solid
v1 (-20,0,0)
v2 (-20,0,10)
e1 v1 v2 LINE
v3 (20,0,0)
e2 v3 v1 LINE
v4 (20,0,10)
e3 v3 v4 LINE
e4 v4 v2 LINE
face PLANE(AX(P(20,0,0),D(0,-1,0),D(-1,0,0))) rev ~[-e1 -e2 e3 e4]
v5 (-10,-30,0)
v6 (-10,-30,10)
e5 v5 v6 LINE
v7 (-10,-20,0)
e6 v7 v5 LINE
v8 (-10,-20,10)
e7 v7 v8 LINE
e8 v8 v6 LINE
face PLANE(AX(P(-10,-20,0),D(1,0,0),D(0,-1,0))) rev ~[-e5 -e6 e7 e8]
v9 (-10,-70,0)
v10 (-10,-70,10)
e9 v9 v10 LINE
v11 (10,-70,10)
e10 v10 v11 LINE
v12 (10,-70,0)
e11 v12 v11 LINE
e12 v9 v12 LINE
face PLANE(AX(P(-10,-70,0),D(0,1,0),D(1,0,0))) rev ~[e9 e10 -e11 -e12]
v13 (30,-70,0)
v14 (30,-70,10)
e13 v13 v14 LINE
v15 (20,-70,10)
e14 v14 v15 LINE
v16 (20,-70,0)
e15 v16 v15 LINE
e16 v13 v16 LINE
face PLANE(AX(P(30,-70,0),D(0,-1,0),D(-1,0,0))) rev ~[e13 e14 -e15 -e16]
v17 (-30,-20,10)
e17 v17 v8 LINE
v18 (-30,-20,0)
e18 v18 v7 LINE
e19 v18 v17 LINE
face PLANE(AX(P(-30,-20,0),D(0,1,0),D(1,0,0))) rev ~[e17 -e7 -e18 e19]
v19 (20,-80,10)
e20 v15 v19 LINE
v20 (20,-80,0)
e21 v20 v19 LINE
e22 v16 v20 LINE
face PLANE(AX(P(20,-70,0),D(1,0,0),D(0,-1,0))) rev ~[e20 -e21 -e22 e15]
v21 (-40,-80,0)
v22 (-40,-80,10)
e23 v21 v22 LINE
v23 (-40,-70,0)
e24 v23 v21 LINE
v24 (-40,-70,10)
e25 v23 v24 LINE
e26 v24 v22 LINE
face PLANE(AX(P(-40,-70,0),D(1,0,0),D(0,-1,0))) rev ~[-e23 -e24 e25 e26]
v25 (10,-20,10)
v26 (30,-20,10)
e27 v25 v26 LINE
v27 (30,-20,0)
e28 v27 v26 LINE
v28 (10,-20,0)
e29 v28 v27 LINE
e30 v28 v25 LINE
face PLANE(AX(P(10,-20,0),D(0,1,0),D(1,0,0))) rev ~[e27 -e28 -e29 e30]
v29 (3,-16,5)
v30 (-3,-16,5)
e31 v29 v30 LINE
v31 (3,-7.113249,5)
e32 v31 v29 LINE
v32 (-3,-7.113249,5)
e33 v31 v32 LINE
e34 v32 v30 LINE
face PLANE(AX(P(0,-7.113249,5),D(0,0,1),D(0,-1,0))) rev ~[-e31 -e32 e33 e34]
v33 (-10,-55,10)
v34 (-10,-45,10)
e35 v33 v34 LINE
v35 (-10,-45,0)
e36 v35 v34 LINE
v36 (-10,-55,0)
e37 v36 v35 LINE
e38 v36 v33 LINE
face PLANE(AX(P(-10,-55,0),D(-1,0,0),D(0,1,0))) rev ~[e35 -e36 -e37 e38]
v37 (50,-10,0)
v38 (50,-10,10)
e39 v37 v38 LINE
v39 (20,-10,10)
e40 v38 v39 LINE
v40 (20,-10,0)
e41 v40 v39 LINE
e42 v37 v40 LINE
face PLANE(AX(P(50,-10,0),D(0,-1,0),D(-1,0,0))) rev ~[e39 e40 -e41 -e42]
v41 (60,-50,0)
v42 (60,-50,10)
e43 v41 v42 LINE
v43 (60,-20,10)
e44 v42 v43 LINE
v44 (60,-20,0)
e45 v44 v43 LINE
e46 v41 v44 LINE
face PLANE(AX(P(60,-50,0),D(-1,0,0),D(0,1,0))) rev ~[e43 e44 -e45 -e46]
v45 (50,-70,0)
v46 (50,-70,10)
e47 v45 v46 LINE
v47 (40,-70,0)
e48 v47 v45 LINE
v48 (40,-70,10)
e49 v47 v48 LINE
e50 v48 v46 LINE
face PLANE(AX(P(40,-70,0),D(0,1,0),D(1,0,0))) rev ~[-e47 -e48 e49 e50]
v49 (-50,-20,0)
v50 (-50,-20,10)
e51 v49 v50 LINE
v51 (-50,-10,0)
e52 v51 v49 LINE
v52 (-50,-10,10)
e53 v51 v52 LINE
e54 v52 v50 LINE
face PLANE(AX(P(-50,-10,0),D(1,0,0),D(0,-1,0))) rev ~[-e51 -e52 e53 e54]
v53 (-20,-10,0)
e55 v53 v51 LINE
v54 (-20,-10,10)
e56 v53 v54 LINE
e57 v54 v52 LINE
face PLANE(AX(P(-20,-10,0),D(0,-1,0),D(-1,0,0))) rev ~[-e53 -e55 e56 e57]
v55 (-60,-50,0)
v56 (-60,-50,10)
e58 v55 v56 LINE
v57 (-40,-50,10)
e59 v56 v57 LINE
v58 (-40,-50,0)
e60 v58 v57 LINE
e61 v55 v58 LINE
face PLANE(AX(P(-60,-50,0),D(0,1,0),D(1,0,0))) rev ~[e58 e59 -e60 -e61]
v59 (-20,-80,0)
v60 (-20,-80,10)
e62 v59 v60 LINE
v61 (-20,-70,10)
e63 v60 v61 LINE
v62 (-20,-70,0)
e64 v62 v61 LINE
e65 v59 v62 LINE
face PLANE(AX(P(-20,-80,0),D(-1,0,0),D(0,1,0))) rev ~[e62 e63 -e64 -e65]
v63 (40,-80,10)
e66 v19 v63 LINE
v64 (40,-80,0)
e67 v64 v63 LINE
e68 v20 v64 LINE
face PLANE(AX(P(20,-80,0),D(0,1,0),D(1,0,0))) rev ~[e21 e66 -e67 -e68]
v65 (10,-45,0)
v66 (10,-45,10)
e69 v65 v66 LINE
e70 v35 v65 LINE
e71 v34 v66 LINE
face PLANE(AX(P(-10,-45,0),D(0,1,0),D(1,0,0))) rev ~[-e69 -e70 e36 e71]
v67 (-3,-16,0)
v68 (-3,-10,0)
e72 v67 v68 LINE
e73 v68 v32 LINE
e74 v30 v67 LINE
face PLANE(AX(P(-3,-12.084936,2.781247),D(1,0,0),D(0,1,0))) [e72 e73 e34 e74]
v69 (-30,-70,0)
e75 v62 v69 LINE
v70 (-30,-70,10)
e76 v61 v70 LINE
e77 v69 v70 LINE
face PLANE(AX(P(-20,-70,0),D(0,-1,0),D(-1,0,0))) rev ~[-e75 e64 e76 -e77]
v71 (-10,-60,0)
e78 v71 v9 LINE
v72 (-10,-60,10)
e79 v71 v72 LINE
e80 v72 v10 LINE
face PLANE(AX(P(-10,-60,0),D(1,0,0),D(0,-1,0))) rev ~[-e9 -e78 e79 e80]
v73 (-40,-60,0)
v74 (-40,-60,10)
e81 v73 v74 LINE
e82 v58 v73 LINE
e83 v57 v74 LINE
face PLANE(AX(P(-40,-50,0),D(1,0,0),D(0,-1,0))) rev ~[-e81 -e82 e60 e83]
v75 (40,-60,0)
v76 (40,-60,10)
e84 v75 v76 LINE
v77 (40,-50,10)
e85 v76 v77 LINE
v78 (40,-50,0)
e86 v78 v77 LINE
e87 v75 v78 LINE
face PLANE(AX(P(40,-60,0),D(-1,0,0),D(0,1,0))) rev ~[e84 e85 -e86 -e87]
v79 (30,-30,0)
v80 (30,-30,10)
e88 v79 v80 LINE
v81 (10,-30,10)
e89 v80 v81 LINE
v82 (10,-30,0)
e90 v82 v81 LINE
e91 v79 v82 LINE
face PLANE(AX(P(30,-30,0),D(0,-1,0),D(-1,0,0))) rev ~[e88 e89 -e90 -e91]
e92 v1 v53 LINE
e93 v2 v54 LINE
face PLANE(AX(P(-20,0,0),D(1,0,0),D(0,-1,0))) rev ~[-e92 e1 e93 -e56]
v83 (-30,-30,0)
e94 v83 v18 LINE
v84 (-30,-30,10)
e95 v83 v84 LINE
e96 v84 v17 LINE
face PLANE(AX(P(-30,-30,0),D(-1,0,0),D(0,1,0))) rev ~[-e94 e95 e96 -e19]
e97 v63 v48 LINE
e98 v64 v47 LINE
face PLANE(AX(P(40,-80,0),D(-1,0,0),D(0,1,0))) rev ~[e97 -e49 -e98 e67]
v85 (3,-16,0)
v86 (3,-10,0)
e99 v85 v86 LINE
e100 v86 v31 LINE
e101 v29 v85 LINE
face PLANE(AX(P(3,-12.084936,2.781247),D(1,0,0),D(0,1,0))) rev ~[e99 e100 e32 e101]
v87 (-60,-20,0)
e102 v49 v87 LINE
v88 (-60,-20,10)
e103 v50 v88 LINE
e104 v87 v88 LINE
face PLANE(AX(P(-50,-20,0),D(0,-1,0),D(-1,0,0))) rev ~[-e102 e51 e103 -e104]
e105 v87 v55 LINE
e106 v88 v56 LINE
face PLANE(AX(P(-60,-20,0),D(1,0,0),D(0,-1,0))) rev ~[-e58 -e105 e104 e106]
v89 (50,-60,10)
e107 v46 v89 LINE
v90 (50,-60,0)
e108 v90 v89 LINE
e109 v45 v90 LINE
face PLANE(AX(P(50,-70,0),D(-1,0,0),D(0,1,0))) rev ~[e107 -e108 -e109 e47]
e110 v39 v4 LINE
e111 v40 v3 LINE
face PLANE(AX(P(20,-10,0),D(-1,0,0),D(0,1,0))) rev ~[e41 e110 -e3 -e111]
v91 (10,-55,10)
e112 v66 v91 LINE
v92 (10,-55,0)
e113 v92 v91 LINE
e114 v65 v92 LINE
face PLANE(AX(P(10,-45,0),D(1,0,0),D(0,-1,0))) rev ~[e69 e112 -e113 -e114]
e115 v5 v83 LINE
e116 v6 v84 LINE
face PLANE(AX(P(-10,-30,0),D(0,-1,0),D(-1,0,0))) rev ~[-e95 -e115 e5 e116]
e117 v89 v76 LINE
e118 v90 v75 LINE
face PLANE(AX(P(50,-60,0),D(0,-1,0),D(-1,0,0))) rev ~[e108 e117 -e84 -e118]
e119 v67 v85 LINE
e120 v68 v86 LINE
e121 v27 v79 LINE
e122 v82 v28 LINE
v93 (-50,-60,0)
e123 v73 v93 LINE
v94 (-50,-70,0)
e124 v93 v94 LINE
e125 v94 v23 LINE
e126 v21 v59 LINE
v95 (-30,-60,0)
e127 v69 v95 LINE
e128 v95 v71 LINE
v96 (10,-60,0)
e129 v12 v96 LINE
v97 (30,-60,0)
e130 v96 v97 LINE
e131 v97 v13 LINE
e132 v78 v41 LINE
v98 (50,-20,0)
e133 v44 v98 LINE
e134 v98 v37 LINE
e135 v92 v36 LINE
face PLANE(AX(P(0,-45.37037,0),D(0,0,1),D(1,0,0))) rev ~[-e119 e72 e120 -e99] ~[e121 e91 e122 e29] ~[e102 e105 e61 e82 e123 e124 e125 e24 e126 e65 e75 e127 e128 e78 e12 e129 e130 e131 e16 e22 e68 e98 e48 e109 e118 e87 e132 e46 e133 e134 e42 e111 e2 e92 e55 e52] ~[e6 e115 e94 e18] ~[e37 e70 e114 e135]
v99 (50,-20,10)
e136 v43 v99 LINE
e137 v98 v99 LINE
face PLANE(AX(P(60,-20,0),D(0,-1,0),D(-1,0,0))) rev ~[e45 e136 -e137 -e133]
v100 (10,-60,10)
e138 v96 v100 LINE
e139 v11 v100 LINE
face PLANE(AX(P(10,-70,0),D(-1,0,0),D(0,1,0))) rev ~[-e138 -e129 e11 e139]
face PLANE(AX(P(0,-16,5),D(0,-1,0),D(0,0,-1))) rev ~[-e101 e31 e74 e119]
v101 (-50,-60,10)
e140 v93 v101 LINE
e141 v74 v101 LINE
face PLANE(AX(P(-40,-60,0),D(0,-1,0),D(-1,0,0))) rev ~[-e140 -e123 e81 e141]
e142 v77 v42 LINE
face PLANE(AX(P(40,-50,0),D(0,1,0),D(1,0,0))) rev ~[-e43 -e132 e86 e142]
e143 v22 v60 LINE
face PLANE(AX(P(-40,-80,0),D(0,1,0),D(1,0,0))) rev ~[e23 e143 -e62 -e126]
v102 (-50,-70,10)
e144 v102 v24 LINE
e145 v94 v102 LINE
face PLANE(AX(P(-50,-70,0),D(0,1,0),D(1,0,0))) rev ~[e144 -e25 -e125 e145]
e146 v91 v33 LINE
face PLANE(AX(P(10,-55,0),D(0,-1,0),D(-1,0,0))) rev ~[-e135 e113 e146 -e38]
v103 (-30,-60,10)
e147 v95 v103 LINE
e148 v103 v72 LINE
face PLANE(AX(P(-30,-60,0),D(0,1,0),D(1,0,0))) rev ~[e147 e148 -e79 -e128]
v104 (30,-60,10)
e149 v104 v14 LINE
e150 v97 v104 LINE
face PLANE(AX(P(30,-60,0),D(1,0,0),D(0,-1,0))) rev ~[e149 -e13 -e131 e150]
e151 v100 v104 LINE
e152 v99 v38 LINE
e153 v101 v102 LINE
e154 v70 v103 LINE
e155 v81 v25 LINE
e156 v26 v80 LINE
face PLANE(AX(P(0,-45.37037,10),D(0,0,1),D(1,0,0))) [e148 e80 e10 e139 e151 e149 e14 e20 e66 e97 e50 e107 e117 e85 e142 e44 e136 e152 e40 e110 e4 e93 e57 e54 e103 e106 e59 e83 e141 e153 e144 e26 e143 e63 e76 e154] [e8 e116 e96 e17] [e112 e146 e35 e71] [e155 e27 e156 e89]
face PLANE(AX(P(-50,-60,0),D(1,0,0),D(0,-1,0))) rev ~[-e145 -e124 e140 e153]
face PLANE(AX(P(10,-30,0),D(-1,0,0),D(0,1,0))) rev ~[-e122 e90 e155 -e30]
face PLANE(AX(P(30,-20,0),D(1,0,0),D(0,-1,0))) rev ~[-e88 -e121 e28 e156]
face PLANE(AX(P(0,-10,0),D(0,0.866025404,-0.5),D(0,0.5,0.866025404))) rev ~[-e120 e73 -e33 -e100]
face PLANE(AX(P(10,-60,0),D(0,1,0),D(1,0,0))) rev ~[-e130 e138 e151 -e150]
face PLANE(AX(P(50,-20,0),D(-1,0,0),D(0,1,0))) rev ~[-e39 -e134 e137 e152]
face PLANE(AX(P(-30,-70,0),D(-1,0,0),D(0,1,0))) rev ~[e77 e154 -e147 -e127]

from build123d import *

# Parameters (mm, degrees)
F0_R     = 6
F1_DEPTH = 10
F3_DEPTH = 3


with BuildPart() as f1:
    # F0 (on Top) → F1 (new body)
    with BuildSketch(Plane.XY):
        Polygon((10, 0), (0, 0), (-10, 0), (-20, 0), (-20, -10), (-30, -10), (-40, -10), (-50, -10), (-50, -20), (-60, -20), (-60, -30), (-60, -40), (-60, -50), (-50, -50), (-40, -50), (-40, -60), (-50, -60), (-50, -70), (-40, -70), (-40, -80), (-30, -80), (-20, -80), (-20, -70), (-30, -70), (-30, -60), (-20, -60), (-10, -60), (-10, -70), (0, -70), (10, -70), (10, -60), (20, -60), (30, -60), (30, -70), (20, -70), (20, -80), (30, -80), (40, -80), (40, -70), (50, -70), (50, -60), (40, -60), (40, -50), (50, -50), (60, -50), (60, -40), (60, -30), (60, -20), (50, -20), (50, -10), (40, -10), (30, -10), (20, -10), (20, 0), align=None)
        Polygon((-10, -45), (0, -45), (10, -45), (10, -55), (0, -55), (-10, -55), align=None, mode=Mode.SUBTRACT)
        Polygon((-30, -30), (-30, -20), (-20, -20), (-10, -20), (-10, -30), (-20, -30), align=None, mode=Mode.SUBTRACT)
        Polygon((10, -20), (20, -20), (30, -20), (30, -30), (20, -30), (10, -30), align=None, mode=Mode.SUBTRACT)
        with Locations((0, -12)):
            Circle(F0_R, mode=Mode.SUBTRACT)
        with Locations((0, -12)):
            Circle(F0_R)
    extrude(amount=F1_DEPTH)

    # F2 (on Right) → F3 (cut, symmetric)
    with BuildSketch(Plane.YZ):
        Polygon((-16, 5), (-16, 0), (-10, 0), (-7.1132486541, 5), align=None)
    extrude(amount=F3_DEPTH, both=True, mode=Mode.SUBTRACT)


solid = f1.part
